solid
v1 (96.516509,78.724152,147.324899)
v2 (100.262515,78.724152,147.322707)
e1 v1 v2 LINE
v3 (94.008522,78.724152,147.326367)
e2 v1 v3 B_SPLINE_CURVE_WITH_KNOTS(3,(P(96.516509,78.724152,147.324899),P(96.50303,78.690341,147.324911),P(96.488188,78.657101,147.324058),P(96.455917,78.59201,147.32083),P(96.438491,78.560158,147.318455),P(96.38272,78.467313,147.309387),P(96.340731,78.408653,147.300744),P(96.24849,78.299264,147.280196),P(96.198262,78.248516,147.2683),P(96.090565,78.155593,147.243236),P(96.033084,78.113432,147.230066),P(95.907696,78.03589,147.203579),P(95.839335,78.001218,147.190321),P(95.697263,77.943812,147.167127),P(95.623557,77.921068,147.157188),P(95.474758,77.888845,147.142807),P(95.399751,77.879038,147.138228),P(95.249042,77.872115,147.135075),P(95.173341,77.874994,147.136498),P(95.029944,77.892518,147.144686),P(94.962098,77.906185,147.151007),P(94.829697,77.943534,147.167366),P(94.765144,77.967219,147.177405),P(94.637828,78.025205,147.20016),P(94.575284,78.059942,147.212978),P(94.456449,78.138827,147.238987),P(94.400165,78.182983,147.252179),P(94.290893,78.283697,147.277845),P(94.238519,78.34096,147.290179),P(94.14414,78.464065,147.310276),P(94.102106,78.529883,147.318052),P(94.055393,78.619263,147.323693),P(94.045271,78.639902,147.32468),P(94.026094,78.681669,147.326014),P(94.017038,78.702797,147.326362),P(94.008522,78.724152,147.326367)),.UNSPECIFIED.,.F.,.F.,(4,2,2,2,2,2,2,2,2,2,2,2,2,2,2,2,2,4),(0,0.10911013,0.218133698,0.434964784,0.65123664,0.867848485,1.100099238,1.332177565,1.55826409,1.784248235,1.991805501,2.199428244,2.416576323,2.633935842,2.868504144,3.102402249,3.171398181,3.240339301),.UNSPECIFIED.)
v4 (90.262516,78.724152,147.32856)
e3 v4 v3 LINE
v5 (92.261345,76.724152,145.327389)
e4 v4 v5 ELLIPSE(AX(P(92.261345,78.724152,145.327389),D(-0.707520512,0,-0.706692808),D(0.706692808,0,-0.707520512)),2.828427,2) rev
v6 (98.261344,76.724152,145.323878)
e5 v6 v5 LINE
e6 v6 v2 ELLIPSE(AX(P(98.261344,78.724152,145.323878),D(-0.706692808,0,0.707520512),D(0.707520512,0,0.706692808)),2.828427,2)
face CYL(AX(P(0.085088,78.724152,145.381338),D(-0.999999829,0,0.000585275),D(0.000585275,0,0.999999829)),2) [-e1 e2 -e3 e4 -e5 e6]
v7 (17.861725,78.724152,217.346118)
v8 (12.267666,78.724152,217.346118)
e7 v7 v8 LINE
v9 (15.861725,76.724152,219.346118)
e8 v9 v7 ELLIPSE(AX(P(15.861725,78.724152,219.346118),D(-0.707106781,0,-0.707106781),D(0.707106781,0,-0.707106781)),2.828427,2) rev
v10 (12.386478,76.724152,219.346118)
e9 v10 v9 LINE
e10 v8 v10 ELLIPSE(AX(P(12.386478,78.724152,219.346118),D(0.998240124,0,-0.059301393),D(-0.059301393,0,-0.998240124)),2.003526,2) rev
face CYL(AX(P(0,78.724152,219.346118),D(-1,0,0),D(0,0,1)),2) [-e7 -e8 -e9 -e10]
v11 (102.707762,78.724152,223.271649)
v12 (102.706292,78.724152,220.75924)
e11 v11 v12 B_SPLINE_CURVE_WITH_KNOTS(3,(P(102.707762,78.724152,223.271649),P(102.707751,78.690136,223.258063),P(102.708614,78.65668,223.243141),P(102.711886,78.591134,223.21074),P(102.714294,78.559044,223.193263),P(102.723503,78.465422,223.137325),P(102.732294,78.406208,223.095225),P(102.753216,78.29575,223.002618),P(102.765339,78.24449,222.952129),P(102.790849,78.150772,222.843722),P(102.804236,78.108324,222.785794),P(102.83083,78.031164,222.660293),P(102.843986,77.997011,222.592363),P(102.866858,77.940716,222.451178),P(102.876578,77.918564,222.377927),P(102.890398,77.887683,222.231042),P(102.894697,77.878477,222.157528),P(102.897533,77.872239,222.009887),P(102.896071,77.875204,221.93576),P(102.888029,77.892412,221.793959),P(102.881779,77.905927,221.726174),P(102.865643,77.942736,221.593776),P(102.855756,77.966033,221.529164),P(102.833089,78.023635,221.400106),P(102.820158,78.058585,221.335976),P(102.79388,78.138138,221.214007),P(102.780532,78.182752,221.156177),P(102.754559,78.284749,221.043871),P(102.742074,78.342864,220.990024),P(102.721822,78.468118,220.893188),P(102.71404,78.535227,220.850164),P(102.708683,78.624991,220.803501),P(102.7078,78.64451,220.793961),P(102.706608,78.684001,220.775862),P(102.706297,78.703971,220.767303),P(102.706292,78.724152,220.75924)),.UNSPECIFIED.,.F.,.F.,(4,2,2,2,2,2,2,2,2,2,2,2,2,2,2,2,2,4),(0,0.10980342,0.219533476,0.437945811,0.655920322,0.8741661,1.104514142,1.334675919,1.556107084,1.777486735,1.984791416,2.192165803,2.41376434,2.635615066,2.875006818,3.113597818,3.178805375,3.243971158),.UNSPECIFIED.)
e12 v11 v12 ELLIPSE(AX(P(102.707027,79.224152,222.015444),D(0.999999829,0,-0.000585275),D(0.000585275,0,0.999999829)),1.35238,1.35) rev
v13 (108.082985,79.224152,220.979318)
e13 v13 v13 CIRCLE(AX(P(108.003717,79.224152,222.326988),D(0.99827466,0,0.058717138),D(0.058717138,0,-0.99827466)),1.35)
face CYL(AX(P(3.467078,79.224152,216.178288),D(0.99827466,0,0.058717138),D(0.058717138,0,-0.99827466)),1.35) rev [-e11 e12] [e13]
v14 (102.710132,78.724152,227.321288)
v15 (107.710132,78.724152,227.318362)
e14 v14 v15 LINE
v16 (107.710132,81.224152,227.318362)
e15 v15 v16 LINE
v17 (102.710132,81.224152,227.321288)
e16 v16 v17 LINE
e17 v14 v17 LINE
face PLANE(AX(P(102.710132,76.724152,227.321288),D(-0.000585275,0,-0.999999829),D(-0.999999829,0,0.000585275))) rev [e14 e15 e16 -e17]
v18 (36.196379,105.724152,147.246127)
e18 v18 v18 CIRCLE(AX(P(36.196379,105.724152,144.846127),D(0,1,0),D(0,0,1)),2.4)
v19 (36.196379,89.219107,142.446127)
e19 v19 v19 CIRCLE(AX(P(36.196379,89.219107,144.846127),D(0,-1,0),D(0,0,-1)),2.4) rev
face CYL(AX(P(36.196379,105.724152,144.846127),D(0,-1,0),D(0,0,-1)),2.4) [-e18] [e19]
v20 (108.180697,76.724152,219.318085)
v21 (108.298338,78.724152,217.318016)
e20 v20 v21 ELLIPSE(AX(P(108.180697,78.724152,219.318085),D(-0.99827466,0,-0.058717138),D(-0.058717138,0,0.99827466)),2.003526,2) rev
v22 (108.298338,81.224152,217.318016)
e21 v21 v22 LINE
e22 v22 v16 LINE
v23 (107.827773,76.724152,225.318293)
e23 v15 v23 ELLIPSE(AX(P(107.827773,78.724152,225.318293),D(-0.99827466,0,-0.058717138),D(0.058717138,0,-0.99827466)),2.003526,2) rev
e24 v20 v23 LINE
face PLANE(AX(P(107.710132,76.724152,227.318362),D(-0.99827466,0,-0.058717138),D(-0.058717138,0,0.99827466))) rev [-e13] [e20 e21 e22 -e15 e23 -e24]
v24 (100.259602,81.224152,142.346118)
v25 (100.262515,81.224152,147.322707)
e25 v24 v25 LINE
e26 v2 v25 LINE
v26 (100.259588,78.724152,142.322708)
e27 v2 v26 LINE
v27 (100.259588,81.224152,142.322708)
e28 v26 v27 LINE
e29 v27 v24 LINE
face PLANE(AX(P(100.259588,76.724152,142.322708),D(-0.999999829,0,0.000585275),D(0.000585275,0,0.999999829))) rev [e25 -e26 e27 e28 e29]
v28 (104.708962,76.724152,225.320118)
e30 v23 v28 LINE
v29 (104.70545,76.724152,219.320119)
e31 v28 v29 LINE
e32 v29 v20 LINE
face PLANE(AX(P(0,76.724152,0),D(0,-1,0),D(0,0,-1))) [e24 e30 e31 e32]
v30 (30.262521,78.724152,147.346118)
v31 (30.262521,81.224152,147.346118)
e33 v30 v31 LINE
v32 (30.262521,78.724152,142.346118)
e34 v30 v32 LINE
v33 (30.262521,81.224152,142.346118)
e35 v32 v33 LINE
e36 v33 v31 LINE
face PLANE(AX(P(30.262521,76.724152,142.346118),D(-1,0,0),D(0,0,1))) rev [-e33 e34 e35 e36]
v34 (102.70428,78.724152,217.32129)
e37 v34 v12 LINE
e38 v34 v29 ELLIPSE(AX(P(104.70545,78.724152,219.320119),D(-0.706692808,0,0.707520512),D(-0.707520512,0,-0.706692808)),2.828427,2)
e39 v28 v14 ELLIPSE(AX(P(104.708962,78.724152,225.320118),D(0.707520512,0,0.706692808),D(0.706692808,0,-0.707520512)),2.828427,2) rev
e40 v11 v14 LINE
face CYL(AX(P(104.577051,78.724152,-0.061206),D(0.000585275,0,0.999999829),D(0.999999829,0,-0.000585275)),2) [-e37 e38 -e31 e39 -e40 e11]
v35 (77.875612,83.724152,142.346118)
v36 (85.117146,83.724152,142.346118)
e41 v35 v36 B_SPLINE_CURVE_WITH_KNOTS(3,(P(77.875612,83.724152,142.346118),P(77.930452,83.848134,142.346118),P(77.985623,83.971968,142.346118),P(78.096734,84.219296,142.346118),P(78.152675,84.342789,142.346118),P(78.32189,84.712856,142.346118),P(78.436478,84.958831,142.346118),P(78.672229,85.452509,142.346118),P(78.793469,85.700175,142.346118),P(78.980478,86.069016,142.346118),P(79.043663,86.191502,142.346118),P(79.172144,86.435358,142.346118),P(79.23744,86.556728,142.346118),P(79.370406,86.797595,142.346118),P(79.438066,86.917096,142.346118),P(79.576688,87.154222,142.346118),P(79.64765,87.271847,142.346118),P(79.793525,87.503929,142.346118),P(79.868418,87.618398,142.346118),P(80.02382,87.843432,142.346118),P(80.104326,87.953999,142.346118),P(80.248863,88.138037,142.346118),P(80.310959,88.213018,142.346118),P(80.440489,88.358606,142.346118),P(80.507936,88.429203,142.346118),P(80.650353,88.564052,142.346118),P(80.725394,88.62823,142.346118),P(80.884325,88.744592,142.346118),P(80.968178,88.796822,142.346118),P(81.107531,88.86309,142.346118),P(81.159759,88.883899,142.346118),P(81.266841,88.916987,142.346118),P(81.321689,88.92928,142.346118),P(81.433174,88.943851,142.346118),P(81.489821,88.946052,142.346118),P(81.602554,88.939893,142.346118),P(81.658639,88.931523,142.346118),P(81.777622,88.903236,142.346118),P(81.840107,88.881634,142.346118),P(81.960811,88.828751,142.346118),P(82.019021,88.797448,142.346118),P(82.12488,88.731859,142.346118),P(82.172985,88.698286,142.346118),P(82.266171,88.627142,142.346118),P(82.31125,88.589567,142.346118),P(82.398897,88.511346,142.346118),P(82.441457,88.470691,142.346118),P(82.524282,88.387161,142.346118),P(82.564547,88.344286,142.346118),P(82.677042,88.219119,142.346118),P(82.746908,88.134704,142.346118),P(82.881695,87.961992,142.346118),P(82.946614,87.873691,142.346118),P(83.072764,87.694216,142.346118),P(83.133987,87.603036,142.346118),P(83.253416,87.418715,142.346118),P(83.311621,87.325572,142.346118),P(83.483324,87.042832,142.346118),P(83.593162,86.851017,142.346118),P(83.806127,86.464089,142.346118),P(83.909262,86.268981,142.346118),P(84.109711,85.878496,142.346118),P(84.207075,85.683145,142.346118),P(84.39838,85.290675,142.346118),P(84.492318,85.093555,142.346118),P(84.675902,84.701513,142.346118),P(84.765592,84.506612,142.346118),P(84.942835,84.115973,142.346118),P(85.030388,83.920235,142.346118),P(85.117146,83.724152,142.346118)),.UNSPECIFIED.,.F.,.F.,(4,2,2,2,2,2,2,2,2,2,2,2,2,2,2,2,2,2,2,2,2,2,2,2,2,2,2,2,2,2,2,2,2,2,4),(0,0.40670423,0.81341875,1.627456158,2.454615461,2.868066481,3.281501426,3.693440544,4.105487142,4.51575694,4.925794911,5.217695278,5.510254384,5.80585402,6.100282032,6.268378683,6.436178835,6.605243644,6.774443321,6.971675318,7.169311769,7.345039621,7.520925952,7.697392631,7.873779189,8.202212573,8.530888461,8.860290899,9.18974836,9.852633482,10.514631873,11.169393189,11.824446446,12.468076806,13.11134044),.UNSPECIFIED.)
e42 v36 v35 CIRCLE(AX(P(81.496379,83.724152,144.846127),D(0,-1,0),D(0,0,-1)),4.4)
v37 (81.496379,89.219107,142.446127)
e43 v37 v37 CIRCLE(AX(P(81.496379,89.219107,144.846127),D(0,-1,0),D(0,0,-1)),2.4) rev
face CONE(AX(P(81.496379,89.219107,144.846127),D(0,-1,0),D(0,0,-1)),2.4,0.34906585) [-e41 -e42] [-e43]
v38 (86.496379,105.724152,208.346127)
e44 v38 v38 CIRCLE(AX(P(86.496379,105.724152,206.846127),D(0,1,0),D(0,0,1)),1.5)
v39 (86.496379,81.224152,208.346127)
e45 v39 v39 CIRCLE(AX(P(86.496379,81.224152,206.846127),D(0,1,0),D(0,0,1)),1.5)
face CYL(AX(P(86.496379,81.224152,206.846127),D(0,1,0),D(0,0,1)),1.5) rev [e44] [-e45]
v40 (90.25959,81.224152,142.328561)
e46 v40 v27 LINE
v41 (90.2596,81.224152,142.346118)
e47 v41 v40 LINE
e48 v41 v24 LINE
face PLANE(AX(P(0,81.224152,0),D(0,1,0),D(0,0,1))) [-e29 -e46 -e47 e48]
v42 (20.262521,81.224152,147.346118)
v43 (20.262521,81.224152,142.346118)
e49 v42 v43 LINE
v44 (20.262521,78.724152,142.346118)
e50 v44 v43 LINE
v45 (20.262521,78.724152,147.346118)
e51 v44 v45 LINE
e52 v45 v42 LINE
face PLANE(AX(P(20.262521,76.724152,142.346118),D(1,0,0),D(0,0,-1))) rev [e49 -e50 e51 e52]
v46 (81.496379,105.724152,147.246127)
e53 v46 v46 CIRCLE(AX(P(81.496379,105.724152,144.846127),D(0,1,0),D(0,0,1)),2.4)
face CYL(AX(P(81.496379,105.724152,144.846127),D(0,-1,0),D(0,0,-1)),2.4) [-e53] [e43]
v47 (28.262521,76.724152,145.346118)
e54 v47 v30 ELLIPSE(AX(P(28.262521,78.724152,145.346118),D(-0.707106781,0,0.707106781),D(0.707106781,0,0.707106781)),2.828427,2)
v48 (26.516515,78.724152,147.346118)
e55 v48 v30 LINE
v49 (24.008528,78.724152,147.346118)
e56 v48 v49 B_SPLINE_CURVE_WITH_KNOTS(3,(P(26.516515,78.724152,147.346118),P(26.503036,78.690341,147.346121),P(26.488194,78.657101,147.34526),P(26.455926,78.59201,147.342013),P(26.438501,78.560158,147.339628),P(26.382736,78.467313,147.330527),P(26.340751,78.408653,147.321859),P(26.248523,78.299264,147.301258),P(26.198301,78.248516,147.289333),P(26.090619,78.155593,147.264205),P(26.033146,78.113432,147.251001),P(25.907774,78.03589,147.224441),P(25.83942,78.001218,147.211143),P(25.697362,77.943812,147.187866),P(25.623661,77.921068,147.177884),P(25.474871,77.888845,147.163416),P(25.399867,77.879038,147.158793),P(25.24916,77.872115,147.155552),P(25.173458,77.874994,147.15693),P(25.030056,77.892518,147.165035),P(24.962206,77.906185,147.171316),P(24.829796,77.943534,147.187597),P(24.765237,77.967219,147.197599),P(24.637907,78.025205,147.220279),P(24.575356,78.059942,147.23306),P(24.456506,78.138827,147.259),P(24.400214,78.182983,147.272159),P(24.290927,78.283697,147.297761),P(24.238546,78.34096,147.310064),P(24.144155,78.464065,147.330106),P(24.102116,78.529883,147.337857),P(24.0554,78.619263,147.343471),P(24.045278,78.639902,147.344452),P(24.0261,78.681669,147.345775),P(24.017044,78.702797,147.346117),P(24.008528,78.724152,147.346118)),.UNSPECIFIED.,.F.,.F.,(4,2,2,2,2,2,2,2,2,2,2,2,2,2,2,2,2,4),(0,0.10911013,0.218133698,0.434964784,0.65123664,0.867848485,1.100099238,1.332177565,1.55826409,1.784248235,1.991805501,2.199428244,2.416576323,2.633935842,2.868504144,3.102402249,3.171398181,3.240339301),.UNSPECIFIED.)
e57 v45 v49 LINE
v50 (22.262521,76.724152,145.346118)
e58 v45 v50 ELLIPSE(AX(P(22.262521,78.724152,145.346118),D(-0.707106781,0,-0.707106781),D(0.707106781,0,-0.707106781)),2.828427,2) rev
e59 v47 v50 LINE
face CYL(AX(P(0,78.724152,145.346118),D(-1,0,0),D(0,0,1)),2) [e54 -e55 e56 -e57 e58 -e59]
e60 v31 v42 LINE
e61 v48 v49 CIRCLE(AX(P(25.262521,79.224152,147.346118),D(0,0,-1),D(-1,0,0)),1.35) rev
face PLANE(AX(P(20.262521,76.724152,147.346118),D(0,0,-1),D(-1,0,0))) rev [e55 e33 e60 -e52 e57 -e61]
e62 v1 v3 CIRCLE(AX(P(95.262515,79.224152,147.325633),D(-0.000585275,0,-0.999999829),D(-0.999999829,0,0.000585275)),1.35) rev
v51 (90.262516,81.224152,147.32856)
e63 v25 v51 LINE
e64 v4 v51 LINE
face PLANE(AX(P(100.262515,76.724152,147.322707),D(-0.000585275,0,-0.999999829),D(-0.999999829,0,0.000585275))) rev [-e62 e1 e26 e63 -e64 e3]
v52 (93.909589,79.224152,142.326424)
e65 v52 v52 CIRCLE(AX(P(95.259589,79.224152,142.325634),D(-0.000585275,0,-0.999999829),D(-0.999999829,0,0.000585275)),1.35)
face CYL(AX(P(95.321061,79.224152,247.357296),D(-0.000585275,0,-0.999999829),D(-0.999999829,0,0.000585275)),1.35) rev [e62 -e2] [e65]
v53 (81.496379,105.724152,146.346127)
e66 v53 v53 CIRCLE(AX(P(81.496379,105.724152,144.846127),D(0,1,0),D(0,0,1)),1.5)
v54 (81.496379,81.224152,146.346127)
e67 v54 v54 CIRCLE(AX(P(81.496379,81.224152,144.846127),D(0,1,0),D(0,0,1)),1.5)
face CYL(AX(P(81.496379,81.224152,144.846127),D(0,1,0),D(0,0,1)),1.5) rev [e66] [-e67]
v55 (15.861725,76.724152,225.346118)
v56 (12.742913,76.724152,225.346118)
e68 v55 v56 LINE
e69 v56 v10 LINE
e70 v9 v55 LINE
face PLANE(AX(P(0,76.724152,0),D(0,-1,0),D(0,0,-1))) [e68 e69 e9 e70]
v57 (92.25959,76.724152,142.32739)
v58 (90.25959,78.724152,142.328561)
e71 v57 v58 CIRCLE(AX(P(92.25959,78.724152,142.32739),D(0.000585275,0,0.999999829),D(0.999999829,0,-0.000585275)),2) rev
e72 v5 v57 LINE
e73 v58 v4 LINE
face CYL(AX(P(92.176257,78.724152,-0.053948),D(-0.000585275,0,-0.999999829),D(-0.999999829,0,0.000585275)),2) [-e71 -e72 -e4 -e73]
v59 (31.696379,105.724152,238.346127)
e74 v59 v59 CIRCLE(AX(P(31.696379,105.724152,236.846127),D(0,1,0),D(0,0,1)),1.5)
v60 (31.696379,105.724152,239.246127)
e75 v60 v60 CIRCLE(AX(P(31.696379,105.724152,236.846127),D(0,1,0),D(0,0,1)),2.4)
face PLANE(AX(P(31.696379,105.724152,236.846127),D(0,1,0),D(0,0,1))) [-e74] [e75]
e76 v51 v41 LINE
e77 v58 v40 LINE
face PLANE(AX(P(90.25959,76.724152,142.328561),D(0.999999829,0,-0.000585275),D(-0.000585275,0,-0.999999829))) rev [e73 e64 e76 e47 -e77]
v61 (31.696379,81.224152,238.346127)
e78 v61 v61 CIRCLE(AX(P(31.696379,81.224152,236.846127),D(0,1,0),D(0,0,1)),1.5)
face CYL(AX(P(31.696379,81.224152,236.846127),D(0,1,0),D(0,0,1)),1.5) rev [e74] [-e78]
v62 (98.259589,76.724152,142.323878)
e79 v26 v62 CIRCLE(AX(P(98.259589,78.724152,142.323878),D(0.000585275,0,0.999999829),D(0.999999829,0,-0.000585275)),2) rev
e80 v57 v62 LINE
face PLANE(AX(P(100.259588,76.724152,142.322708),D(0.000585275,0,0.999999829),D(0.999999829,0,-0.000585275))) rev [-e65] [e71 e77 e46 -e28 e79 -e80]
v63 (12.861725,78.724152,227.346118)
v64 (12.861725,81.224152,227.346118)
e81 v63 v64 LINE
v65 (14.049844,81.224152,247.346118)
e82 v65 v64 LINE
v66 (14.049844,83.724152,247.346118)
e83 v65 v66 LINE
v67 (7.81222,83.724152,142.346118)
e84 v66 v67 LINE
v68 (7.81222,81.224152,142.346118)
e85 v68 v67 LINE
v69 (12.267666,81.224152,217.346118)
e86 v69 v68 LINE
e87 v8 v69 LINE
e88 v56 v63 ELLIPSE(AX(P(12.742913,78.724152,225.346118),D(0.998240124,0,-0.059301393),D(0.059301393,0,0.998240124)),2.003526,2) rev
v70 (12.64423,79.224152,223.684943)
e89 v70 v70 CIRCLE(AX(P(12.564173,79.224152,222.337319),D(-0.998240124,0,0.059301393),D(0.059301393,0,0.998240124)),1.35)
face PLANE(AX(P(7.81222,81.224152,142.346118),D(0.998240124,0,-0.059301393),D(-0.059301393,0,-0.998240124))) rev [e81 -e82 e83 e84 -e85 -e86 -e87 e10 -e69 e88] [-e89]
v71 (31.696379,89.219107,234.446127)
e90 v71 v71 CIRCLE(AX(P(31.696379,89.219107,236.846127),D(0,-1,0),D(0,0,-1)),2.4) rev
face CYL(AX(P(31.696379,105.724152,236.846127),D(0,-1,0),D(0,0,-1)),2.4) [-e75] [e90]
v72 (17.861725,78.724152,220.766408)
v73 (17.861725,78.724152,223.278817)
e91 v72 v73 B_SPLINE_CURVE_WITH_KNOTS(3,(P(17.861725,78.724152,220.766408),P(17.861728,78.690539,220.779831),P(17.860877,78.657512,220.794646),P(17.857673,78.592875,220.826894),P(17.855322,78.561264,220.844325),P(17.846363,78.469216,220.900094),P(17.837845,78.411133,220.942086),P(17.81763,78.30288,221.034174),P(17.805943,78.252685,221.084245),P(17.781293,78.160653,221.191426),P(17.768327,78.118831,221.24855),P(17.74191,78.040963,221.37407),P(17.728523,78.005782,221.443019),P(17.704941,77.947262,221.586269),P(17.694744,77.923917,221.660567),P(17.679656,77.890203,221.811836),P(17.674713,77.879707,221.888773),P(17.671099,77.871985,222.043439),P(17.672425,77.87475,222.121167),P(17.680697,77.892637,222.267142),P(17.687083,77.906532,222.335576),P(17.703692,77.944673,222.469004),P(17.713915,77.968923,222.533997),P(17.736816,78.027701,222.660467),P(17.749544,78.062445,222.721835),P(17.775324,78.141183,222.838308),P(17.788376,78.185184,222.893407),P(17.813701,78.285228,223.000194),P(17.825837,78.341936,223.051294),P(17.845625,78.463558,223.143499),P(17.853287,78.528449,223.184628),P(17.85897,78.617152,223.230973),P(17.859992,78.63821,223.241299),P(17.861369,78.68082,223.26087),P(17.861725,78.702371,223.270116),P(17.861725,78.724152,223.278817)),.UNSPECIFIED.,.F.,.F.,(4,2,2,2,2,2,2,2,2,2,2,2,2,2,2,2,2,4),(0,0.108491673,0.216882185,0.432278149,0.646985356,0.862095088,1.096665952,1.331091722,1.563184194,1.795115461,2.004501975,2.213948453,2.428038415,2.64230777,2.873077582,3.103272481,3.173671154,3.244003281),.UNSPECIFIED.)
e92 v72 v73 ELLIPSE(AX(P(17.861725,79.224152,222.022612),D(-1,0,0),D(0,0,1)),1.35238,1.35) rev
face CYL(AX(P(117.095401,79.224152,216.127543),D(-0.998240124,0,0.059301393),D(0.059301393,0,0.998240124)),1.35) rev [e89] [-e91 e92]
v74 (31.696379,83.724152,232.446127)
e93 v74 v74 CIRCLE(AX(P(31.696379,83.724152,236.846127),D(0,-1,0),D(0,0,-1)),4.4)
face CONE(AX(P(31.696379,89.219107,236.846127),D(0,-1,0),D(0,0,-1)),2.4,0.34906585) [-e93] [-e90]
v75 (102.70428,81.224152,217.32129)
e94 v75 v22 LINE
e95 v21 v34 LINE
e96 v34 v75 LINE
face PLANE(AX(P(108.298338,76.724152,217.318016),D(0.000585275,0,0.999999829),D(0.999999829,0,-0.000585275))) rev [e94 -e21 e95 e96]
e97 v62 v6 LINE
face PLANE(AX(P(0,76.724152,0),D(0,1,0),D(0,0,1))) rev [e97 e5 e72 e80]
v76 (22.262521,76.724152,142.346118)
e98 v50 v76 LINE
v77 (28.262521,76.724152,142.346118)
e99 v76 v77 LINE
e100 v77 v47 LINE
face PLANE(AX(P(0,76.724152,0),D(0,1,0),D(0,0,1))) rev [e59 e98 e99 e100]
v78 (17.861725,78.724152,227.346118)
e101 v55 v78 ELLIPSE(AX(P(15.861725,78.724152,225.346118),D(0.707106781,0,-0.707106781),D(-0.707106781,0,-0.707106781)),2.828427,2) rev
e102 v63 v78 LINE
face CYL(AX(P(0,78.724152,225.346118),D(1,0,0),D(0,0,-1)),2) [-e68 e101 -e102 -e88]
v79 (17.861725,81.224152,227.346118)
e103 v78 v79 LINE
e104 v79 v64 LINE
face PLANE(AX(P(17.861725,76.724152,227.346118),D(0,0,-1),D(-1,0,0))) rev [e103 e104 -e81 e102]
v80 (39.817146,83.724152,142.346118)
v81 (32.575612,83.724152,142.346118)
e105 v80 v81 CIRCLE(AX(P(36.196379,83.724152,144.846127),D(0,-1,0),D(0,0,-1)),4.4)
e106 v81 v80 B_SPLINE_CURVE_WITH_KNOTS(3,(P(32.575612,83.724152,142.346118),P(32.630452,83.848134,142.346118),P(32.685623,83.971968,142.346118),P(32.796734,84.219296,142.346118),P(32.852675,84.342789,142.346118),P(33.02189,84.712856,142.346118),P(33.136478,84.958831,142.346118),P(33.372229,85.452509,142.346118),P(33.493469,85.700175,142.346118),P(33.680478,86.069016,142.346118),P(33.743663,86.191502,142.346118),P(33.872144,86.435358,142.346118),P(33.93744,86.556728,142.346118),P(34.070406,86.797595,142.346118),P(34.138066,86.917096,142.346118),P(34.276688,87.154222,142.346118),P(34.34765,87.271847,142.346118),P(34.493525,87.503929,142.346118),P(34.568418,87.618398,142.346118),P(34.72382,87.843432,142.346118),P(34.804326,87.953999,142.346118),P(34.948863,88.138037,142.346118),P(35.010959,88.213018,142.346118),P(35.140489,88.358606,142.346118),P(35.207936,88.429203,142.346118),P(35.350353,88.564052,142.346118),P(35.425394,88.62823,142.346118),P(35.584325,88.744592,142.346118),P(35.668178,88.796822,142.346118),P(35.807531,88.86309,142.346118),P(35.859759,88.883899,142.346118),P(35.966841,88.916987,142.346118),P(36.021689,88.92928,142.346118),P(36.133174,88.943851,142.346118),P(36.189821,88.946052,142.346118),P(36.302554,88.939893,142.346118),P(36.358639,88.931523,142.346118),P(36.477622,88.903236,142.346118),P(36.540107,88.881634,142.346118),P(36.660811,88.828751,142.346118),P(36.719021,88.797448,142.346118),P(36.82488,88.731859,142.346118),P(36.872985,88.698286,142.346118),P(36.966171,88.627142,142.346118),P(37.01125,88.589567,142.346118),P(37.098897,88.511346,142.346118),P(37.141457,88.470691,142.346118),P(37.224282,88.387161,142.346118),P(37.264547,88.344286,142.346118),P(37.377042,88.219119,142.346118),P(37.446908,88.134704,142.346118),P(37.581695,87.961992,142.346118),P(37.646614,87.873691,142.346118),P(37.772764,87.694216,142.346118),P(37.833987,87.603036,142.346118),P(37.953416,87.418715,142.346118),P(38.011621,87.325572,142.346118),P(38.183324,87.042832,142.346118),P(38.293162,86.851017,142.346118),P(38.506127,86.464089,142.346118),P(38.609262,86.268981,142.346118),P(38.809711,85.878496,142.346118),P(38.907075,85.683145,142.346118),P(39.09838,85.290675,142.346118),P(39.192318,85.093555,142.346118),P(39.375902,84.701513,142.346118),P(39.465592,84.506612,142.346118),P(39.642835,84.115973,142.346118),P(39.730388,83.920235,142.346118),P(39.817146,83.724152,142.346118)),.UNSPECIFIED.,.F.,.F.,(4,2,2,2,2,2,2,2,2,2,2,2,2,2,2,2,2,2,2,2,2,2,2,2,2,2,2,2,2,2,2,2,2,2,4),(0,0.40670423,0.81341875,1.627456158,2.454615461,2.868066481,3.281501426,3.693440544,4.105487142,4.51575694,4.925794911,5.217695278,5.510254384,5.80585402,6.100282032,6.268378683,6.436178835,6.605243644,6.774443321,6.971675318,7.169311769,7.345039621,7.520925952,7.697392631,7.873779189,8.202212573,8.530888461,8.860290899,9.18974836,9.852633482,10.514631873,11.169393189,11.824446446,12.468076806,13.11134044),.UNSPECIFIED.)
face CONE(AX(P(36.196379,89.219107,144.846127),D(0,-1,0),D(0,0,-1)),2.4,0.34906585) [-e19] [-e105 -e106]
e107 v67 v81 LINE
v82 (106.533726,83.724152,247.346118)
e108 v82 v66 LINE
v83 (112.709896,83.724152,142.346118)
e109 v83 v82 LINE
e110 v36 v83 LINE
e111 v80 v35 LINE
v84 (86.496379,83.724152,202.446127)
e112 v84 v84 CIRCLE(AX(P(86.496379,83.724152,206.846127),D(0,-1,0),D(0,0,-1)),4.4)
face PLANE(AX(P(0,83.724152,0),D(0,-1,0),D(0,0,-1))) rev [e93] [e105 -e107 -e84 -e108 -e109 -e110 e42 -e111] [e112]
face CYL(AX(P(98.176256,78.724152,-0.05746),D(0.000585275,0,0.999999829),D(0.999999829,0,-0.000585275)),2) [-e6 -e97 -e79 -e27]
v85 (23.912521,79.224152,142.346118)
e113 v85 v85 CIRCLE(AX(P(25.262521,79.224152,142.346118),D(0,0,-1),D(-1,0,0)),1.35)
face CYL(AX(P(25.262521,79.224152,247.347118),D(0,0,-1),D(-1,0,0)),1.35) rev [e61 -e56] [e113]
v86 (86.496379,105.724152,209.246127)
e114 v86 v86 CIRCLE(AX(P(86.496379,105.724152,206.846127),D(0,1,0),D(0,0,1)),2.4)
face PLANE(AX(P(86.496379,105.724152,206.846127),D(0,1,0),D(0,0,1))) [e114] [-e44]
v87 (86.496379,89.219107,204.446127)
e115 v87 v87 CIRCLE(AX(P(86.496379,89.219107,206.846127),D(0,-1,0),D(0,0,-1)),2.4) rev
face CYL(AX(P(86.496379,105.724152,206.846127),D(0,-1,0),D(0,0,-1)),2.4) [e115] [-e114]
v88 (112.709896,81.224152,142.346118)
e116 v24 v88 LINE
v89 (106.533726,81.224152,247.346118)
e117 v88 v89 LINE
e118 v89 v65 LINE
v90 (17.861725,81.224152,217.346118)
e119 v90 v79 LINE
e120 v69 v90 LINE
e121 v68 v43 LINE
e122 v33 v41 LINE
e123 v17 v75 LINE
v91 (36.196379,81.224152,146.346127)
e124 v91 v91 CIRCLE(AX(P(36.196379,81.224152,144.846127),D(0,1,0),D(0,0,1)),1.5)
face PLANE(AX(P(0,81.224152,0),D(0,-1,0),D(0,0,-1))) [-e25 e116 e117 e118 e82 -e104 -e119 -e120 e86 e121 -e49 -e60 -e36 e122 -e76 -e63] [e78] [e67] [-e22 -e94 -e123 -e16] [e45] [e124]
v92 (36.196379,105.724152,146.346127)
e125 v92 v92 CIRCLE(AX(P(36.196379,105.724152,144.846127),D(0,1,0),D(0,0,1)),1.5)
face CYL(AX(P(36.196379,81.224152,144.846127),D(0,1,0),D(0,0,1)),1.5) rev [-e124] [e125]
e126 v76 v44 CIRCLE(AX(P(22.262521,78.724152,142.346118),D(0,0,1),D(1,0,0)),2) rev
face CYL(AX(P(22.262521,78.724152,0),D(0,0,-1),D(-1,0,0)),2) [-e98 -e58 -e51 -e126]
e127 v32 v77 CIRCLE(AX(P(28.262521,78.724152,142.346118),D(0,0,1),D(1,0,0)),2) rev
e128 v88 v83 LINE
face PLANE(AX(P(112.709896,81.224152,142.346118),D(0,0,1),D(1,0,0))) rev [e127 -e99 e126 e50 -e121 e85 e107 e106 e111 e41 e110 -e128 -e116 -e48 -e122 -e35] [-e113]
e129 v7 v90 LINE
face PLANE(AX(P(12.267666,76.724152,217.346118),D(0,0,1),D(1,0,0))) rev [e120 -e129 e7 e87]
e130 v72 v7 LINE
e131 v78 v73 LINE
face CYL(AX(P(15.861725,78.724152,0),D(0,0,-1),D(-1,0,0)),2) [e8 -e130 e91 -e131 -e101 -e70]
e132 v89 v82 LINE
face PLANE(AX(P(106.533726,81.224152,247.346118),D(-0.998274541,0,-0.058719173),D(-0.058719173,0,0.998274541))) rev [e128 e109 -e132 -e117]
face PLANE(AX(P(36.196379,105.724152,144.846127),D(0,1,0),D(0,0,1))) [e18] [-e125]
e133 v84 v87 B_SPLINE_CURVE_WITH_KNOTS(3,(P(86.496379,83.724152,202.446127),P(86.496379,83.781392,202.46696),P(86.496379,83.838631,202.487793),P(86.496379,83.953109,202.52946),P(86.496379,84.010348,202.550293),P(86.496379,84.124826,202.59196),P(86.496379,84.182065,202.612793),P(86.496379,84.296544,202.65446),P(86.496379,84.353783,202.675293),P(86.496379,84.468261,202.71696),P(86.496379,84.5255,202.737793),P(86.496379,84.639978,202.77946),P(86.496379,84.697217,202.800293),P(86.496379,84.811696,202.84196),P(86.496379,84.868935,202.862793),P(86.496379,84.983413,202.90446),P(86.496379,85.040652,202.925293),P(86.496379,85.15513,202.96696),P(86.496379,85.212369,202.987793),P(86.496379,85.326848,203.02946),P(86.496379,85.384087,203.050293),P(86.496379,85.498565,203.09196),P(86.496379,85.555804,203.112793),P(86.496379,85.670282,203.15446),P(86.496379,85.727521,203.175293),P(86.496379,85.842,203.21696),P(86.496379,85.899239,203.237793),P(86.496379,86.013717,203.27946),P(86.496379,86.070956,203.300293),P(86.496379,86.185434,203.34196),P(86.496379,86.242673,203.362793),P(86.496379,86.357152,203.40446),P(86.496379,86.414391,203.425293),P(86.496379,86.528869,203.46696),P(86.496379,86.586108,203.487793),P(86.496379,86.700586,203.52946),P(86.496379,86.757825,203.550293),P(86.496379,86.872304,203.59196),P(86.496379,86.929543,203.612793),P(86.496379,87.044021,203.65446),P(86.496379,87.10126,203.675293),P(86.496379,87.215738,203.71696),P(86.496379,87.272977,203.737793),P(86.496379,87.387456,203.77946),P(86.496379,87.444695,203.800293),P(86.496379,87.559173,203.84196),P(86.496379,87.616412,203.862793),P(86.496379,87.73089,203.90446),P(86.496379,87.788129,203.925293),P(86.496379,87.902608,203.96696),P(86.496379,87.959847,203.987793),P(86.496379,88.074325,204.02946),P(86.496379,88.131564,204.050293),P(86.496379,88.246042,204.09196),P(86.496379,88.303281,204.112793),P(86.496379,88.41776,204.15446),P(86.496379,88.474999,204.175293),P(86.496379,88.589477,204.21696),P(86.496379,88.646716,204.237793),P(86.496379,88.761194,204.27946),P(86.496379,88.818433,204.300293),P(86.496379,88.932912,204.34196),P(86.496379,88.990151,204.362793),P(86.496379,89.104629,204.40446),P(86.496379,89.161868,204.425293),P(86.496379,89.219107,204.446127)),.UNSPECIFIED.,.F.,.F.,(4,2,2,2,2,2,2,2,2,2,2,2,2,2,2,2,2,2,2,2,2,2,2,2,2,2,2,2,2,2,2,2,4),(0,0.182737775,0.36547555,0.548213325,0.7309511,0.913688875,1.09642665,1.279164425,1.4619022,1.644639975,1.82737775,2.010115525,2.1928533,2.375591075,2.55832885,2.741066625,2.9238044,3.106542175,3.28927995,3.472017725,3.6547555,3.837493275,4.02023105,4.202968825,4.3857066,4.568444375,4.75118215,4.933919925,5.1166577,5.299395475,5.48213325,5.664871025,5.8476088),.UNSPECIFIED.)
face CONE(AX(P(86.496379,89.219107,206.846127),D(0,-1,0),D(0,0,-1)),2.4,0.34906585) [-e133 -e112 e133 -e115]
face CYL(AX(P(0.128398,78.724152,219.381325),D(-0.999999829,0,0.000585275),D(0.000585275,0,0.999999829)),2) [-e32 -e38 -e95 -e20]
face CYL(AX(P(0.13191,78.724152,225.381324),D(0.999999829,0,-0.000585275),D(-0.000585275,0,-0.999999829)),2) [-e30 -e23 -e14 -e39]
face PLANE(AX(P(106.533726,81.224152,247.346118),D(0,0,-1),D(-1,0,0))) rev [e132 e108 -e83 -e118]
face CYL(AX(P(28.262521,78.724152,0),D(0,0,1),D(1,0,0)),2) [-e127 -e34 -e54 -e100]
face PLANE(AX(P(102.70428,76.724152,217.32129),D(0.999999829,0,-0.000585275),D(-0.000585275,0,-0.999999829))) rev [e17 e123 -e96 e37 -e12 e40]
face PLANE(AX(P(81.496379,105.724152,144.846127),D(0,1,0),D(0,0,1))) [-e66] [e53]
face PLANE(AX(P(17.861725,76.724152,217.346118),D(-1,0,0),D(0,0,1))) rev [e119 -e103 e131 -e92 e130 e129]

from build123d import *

# Parameters (mm, degrees)
BOSS_EXTRUDE1_START = 40
BOSS_EXTRUDE1_DEPTH = 2.5
SKETCH2_R           = 2.4
BOSS_EXTRUDE2_DEPTH = 22
CUT_EXTRUDE1_START  = 22
SKETCH2_3_R         = 1.5
CUT_EXTRUDE1_DEPTH  = 295.704277162
CHAMFER1_SIZE       = 2
CHAMFER1_SIZE2      = 5.494954839
CHAMFER2_SIZE       = 2
CHAMFER2_SIZE_2     = 5.494954839
SKETCH3_W           = 10
SKETCH3_H           = 5
BOSS_EXTRUDE3_DEPTH = 4.5
FILLET1_R           = 2
CUT_EXTRUDE2_REACH  = 287.714
SKETCH4_R           = 1.35
CUT_EXTRUDE3_REACH  = 293.869
SKETCH5_R           = 1.35
CUT_EXTRUDE4_REACH  = 188.832
SKETCH6_R           = 1.35
CUT_EXTRUDE5_REACH  = 188.762
SKETCH7_R           = 1.35


with BuildPart() as part:
    # Sketch1 → Boss-Extrude1 (new body)
    with BuildSketch(Plane.XZ.offset(-123.724152422).offset(BOSS_EXTRUDE1_START)):
        Polygon((7.812220157, 142.346117951), (14.049843919, 247.346117951), (106.533726398, 247.346117951), (112.70989627, 142.346117951), align=None)
    extrude(amount=BOSS_EXTRUDE1_DEPTH)

    # Sketch2 → Boss-Extrude2 (add)
    with BuildSketch(Plane(origin=(0, 83.724152422, 0), x_dir=(1, 0, 0), z_dir=(0, 1, 0))):
        with Locations(Location((36.196379089, -144.846126643, 0), (0, 0, 90))):
            Circle(SKETCH2_R)
        with Locations(Location((81.496379089, -144.846126643, 0), (0, 0, 90))):
            Circle(SKETCH2_R)
        with Locations(Location((31.696379089, -236.846126643, 0), (0, 0, 90))):
            Circle(SKETCH2_R)
        with Locations(Location((86.496379089, -206.846126643, 0), (0, 0, 90))):
            Circle(SKETCH2_R)
    extrude(amount=BOSS_EXTRUDE2_DEPTH)

    # Sketch2<3> → Cut-Extrude1 (cut, through all)
    with BuildSketch(Plane(origin=(0, 83.724152422, 0), x_dir=(1, 0, 0), z_dir=(0, 1, 0)).offset(CUT_EXTRUDE1_START)):
        with Locations(Location((81.496379089, -144.846126643, 0), (0, 0, 270))):
            Circle(SKETCH2_3_R)
        with Locations(Location((36.196379089, -144.846126643, 0), (0, 0, 270))):
            Circle(SKETCH2_3_R)
        with Locations(Location((86.496379089, -206.846126643, 0), (0, 0, 270))):
            Circle(SKETCH2_3_R)
        with Locations(Location((31.696379089, -236.846126643, 0), (0, 0, 270))):
            Circle(SKETCH2_3_R)
    extrude(amount=-CUT_EXTRUDE1_DEPTH, mode=Mode.SUBTRACT)

    # Chamfer1
    chamfer1_edges = [part.edges().sort_by_distance(p)[0] for p in [
        (86.496379089, 83.724152422, 209.246126643),
        (31.696379089, 83.724152422, 239.246126643),
    ]]
    chamfer1_side = [part.faces().sort_by_distance(p)[0] for p in [
        (60.285277184, 83.724152422, 193.81865211),
    ]]
    chamfer(chamfer1_edges, length=CHAMFER1_SIZE, length2=CHAMFER1_SIZE2, reference=chamfer1_side[0])

    # Chamfer2
    # the kernel refuses this chamfer: 5.494954839, 2 mm, written as the material it adds along each edge
    with BuildSketch(Plane(origin=(36.196379089, 83.724152422, 144.846126643), x_dir=(0, 0, -1), z_dir=(1, 0, 0))) as chamfer2_piece_1_section:
        Polygon((2.4 + CHAMFER2_SIZE, 0), (2.4, CHAMFER2_SIZE_2), (2.4, 0), align=None)
    chamfer2_piece_1 = revolve(axis=Axis((36.196379089, 83.724152422, 144.846126643), (0, 1, 0)), mode=Mode.PRIVATE)
    chamfer2_piece_1 = split(chamfer2_piece_1, bisect_by=Plane(origin=(36.196379089, 86.455650516, 142.346117951), z_dir=(0, 0, 1)), keep=Keep.TOP, mode=Mode.PRIVATE)
    add(chamfer2_piece_1)
    with BuildSketch(Plane(origin=(81.496379089, 83.724152422, 144.846126643), x_dir=(0, 0, -1), z_dir=(1, 0, 0))) as chamfer2_piece_2_section:
        Polygon((2.4 + CHAMFER2_SIZE, 0), (2.4, CHAMFER2_SIZE_2), (2.4, 0), align=None)
    chamfer2_piece_2 = revolve(axis=Axis((81.496379089, 83.724152422, 144.846126643), (0, 1, 0)), mode=Mode.PRIVATE)
    chamfer2_piece_2 = split(chamfer2_piece_2, bisect_by=Plane(origin=(81.496379089, 86.455650516, 142.346117951), z_dir=(0, 0, 1)), keep=Keep.TOP, mode=Mode.PRIVATE)
    add(chamfer2_piece_2)

    # Sketch3 → Boss-Extrude3 (add)
    with BuildSketch(Plane.XZ.offset(-81.224152422)):
        Polygon((12.267665701, 217.346117951), (17.861725107, 217.346117951), (17.861725107, 227.346117951), (12.861725107, 227.346117951), align=None)
        with Locations((25.262521401, 144.846117951)):
            Rectangle(SKETCH3_W, SKETCH3_H)
        Polygon((107.710131584, 227.318361744), (108.298338138, 217.318015768), (102.70427969, 217.321289832), (102.710132441, 227.321288119), align=None)
        Polygon((90.259589888, 142.328560554), (90.262516263, 147.328559698), (100.26251455, 147.322706947), (100.259588175, 142.322707804), align=None)
    extrude(amount=BOSS_EXTRUDE3_DEPTH)

    # Fillet1
    fillet1_edges = [part.edges().sort_by_distance(p)[0] for p in [
        (100.261051363, 76.724152422, 144.822707375),
        (95.262515407, 76.724152422, 147.325633323),
        (90.261053075, 76.724152422, 144.828560126),
        (20.262521401, 76.724152422, 144.846117951),
        (30.262521401, 76.724152422, 144.846117951),
        (25.262521401, 76.724152422, 147.346117951),
        (15.064695404, 76.724152422, 217.346117951),
        (17.861725107, 76.724152422, 222.346117951),
        (15.361725107, 76.724152422, 227.346117951),
        (105.210132013, 76.724152422, 227.319824931),
        (102.707206065, 76.724152422, 222.321288975),
        (105.501308914, 76.724152422, 217.3196528),
    ]]
    fillet(fillet1_edges, radius=FILLET1_R)

    # Sketch4 → Cut-Extrude2 (cut, up to next)
    with BuildSketch(Plane(origin=(120.663233846, 0, 7.097244942), x_dir=(0.05871713825649746, 0, -0.9982746604391837), z_dir=(0.9982746604391838, 0, 0.058717138256497464)), mode=Mode.PRIVATE) as cut_extrude2_sk1:
        with Locations((-215.601729693, 79.224152422)):
            Circle(SKETCH4_R)
    cut_extrude2_tool1 = extrude(cut_extrude2_sk1.sketch, amount=-CUT_EXTRUDE2_REACH, mode=Mode.PRIVATE) & part.part
    add(cut_extrude2_tool1.solids().sort_by_distance((108.003717, 79.224152, 222.326988))[0], mode=Mode.SUBTRACT)

    # Sketch5 → Cut-Extrude3 (cut, up to next)
    with BuildSketch(Plane(origin=(-0.641720197, 0, 0.038121992), x_dir=(0.05930139349204844, 0, 0.9982401237828007), z_dir=(-0.9982401237828007, 0, 0.05930139349204844)), mode=Mode.PRIVATE) as cut_extrude3_sk1:
        with Locations((222.691105358, 79.224152422)):
            Circle(SKETCH5_R)
    cut_extrude3_tool1 = extrude(cut_extrude3_sk1.sketch, amount=-CUT_EXTRUDE3_REACH, mode=Mode.PRIVATE) & part.part
    add(cut_extrude3_tool1.solids().sort_by_distance((12.564173, 79.224152, 222.337319))[0], mode=Mode.SUBTRACT)

    # Sketch6 → Cut-Extrude4 (cut, up to next)
    with BuildSketch(Plane(origin=(0, 0, 142.346117951), x_dir=(-1, 0, 0), z_dir=(0, 0, -1)), mode=Mode.PRIVATE) as cut_extrude4_sk1:
        with Locations((-25.262521401, 79.224152422)):
            Circle(SKETCH6_R)
    cut_extrude4_tool1 = extrude(cut_extrude4_sk1.sketch, amount=-CUT_EXTRUDE4_REACH, mode=Mode.PRIVATE) & part.part
    add(cut_extrude4_tool1.solids().sort_by_distance((25.262521, 79.224152, 142.346118))[0], mode=Mode.SUBTRACT)

    # Sketch7 → Cut-Extrude5 (cut, up to next)
    with BuildSketch(Plane(origin=(0.083332265, 0, 142.381338481), x_dir=(-0.9999998287265196, 0, 0.0005852750905060992), z_dir=(-0.0005852750905060992, 0, -0.9999998287265196)), mode=Mode.PRIVATE) as cut_extrude5_sk1:
        with Locations((-95.176273068, 79.224152422)):
            Circle(SKETCH7_R)
    cut_extrude5_tool1 = extrude(cut_extrude5_sk1.sketch, amount=-CUT_EXTRUDE5_REACH, mode=Mode.PRIVATE) & part.part
    add(cut_extrude5_tool1.solids().sort_by_distance((95.259589, 79.224152, 142.325634))[0], mode=Mode.SUBTRACT)


solid = part.part
